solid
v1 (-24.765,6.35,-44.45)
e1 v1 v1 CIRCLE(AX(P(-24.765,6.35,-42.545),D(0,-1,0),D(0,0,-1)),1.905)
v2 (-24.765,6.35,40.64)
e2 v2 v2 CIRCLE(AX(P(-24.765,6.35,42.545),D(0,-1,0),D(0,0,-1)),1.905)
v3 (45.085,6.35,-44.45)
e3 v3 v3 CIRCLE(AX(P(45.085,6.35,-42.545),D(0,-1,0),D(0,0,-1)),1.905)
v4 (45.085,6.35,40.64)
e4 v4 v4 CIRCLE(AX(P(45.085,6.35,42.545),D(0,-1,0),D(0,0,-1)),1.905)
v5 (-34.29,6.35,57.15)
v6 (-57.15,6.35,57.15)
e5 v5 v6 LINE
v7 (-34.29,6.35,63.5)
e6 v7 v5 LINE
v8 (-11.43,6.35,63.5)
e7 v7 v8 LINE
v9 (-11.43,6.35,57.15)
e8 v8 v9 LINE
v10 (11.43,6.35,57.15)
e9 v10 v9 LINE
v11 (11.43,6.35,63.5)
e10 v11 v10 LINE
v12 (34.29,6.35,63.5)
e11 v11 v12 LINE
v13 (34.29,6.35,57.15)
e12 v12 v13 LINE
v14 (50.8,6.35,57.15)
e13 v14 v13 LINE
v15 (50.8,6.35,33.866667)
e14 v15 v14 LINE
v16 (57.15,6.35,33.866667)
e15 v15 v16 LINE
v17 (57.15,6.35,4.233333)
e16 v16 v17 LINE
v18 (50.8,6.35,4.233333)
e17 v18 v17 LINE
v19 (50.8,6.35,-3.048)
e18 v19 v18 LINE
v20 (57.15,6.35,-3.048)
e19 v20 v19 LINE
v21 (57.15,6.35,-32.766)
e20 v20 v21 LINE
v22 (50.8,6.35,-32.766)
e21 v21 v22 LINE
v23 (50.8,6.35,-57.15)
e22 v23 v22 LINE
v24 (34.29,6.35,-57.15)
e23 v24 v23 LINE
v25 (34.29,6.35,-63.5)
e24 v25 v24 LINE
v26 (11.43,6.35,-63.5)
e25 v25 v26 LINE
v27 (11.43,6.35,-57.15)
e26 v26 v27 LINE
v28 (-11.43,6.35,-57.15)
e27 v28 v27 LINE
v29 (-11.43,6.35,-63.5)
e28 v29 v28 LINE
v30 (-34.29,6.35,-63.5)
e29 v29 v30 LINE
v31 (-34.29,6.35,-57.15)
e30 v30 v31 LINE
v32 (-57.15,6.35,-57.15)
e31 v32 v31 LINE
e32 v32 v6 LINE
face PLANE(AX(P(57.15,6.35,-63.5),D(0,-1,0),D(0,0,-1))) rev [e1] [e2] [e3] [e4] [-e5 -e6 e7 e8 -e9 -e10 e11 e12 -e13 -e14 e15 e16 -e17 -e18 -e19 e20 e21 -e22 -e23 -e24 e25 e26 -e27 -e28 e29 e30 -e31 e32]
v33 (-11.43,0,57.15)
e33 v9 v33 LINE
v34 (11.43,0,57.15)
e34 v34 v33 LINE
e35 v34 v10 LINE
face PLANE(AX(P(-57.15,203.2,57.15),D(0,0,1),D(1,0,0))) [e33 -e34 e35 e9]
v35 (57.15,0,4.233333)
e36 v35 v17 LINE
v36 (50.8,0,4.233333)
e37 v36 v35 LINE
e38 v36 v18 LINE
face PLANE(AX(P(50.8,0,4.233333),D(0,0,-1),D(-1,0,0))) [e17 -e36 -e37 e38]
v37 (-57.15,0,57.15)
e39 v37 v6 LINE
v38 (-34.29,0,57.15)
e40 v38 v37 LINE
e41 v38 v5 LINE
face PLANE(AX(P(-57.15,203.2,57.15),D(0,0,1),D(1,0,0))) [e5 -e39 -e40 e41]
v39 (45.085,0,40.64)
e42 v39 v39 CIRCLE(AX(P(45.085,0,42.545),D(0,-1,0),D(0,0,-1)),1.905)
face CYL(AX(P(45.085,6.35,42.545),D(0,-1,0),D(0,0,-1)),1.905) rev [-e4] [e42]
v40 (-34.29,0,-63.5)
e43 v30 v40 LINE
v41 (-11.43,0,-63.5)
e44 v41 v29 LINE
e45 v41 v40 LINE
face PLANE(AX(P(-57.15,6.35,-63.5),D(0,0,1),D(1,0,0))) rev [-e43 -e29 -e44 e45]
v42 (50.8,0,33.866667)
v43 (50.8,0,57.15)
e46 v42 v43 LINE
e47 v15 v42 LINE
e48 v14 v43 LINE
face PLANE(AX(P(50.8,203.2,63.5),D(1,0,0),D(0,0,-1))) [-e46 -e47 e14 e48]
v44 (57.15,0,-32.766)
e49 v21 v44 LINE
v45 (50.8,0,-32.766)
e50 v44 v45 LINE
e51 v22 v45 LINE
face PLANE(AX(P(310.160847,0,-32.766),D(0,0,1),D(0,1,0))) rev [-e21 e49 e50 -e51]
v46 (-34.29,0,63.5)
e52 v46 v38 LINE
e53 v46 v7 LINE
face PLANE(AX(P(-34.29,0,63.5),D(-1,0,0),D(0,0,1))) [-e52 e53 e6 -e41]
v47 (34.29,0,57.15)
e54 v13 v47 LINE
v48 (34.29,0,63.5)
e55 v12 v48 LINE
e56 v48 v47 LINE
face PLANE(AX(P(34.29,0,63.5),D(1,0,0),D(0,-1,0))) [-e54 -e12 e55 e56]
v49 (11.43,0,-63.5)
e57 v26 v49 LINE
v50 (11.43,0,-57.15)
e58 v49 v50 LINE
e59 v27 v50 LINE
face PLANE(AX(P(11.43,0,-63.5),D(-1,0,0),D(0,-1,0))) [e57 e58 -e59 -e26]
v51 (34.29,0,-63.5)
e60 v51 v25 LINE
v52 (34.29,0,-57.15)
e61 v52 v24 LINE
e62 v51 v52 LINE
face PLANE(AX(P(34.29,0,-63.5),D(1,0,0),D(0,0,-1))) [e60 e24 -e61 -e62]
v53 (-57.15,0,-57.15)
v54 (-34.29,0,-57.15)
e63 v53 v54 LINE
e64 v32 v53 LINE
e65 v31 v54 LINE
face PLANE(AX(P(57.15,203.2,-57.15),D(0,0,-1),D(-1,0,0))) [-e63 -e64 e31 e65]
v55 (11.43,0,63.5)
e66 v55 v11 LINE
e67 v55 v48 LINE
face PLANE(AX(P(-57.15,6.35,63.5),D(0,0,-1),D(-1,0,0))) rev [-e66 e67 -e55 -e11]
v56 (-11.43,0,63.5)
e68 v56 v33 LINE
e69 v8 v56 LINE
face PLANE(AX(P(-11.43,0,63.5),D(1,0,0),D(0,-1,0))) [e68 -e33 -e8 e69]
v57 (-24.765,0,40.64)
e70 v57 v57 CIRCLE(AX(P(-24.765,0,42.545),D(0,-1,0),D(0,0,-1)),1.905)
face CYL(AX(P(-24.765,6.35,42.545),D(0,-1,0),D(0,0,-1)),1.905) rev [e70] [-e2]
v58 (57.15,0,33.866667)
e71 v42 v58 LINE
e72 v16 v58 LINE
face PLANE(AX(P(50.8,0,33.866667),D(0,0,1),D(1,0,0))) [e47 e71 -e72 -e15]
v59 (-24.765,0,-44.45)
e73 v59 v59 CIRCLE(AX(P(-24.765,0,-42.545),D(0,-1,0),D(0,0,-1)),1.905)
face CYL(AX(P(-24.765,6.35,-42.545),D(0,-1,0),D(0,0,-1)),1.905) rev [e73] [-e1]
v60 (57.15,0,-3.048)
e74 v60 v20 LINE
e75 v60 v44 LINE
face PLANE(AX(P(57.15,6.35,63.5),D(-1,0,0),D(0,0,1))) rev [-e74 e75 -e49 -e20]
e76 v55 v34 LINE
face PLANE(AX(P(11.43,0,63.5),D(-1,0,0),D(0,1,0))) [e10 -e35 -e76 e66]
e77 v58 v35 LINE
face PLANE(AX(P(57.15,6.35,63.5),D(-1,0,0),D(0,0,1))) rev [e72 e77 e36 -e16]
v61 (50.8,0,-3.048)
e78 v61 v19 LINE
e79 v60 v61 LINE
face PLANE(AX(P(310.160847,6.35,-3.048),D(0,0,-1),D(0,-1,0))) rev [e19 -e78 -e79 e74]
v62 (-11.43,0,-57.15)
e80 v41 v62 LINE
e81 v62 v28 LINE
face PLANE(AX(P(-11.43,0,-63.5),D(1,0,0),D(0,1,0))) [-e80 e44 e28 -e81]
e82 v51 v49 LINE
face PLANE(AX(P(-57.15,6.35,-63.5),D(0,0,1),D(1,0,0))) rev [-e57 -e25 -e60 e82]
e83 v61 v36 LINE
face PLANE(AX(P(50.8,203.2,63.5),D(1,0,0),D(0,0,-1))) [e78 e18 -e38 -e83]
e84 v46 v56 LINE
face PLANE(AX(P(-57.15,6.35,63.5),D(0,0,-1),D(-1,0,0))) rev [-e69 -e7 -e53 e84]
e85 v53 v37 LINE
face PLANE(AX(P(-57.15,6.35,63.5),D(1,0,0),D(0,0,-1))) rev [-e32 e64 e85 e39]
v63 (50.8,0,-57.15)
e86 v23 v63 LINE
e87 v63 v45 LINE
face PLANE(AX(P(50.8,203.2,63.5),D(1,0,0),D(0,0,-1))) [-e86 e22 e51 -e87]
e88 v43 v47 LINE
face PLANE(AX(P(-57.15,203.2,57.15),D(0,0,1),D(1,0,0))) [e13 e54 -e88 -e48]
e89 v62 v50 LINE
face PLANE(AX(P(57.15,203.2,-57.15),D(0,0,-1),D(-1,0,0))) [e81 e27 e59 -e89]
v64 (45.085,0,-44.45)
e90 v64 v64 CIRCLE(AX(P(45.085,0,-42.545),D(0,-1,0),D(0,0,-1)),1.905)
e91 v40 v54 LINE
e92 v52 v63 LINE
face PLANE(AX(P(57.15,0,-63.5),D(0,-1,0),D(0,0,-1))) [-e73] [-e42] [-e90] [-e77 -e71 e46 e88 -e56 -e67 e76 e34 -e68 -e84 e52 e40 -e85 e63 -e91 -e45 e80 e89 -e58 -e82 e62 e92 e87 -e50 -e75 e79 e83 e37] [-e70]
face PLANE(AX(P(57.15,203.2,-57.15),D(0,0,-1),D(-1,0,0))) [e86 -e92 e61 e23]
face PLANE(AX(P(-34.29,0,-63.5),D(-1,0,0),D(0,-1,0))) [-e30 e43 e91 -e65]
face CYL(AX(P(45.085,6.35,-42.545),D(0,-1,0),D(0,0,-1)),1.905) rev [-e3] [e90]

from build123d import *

# Parameters (mm, degrees)
SKETCH1_W           = 114.3
SKETCH1_H           = 127
BOSS_EXTRUDE1_DEPTH = 6.35
CAVITY2_START       = 50.8
CAVITY2_OUTLINE_W   = 6.35
CAVITY2_OUTLINE_H   = 29.633333333
CAVITY2_OUTLINE_H_2 = 7.281333333
CAVITY2_OUTLINE_H_3 = 30.734
CAVITY2_DEPTH       = 6.35
CAVITY2_START_2     = -57.15
CAVITY2_2_OUTLINE_W = 6.35
CAVITY2_2_OUTLINE_H = 6.35
CAVITY2_2_DEPTH     = 22.86
CAVITY2_START_3     = -11.43
CAVITY2_3_OUTLINE_W = 6.35
CAVITY2_3_OUTLINE_H = 6.35
CAVITY2_3_DEPTH     = 22.86
CAVITY2_START_4     = 34.29
CAVITY2_4_OUTLINE_W = 6.35
CAVITY2_4_OUTLINE_H = 6.35
CAVITY2_4_DEPTH     = 16.51
SKETCH2_R           = 1.905
CUT_EXTRUDE1_DEPTH  = 86.666183527


# Read off the part's stored shape, not the designer's step: Cavity2
with BuildPart() as part:
    # Sketch1 → Boss-Extrude1 (new body)
    with BuildSketch(Plane(origin=(0, 0, 0), x_dir=(1, 0, 0), z_dir=(0, 1, 0))):
        Rectangle(SKETCH1_W, SKETCH1_H)
    extrude(amount=BOSS_EXTRUDE1_DEPTH)

    # Cavity2 outline → Cavity2 (cut)
    with BuildSketch(Plane.YZ.offset(CAVITY2_START)):
        with Locations((3.175, 48.683333334)):
            Rectangle(CAVITY2_OUTLINE_W, CAVITY2_OUTLINE_H)
        with Locations((3.175, 0.592666666)):
            Rectangle(CAVITY2_OUTLINE_W, CAVITY2_OUTLINE_H_2)
        with Locations((3.175, -48.133)):
            Rectangle(CAVITY2_OUTLINE_W, CAVITY2_OUTLINE_H_3)
    extrude(amount=CAVITY2_DEPTH, mode=Mode.SUBTRACT)

    # Cavity2 2 outline → Cavity2 2 (cut)
    with BuildSketch(Plane.YZ.offset(CAVITY2_START_2)):
        with Locations((3.175, 60.325)):
            Rectangle(CAVITY2_2_OUTLINE_W, CAVITY2_2_OUTLINE_H)
        with Locations((3.175, -60.325)):
            Rectangle(CAVITY2_2_OUTLINE_W, CAVITY2_2_OUTLINE_H)
    extrude(amount=CAVITY2_2_DEPTH, mode=Mode.SUBTRACT)

    # Cavity2 3 outline → Cavity2 3 (cut)
    with BuildSketch(Plane.YZ.offset(CAVITY2_START_3)):
        with Locations((3.175, 60.325)):
            Rectangle(CAVITY2_3_OUTLINE_W, CAVITY2_3_OUTLINE_H)
        with Locations((3.175, -60.325)):
            Rectangle(CAVITY2_3_OUTLINE_W, CAVITY2_3_OUTLINE_H)
    extrude(amount=CAVITY2_3_DEPTH, mode=Mode.SUBTRACT)

    # Cavity2 4 outline → Cavity2 4 (cut)
    with BuildSketch(Plane.YZ.offset(CAVITY2_START_4)):
        with Locations((3.175, 60.325)):
            Rectangle(CAVITY2_4_OUTLINE_W, CAVITY2_4_OUTLINE_H)
        with Locations((3.175, -60.325)):
            Rectangle(CAVITY2_4_OUTLINE_W, CAVITY2_4_OUTLINE_H)
    extrude(amount=CAVITY2_4_DEPTH, mode=Mode.SUBTRACT)

    # Sketch2 → Cut-Extrude1 (cut, through all)
    with BuildSketch(Plane.XZ):
        with Locations(Location((45.085, -42.545, 0), (0, 0, 270))):
            Circle(SKETCH2_R)
        with Locations(Location((-24.765, -42.545, 0), (0, 0, 270))):
            Circle(SKETCH2_R)
        with Locations(Location((45.085, 42.545, 0), (0, 0, 270))):
            Circle(SKETCH2_R)
        with Locations(Location((-24.765, 42.545, 0), (0, 0, 270))):
            Circle(SKETCH2_R)
    extrude(amount=-CUT_EXTRUDE1_DEPTH, mode=Mode.SUBTRACT)


solid = part.part
